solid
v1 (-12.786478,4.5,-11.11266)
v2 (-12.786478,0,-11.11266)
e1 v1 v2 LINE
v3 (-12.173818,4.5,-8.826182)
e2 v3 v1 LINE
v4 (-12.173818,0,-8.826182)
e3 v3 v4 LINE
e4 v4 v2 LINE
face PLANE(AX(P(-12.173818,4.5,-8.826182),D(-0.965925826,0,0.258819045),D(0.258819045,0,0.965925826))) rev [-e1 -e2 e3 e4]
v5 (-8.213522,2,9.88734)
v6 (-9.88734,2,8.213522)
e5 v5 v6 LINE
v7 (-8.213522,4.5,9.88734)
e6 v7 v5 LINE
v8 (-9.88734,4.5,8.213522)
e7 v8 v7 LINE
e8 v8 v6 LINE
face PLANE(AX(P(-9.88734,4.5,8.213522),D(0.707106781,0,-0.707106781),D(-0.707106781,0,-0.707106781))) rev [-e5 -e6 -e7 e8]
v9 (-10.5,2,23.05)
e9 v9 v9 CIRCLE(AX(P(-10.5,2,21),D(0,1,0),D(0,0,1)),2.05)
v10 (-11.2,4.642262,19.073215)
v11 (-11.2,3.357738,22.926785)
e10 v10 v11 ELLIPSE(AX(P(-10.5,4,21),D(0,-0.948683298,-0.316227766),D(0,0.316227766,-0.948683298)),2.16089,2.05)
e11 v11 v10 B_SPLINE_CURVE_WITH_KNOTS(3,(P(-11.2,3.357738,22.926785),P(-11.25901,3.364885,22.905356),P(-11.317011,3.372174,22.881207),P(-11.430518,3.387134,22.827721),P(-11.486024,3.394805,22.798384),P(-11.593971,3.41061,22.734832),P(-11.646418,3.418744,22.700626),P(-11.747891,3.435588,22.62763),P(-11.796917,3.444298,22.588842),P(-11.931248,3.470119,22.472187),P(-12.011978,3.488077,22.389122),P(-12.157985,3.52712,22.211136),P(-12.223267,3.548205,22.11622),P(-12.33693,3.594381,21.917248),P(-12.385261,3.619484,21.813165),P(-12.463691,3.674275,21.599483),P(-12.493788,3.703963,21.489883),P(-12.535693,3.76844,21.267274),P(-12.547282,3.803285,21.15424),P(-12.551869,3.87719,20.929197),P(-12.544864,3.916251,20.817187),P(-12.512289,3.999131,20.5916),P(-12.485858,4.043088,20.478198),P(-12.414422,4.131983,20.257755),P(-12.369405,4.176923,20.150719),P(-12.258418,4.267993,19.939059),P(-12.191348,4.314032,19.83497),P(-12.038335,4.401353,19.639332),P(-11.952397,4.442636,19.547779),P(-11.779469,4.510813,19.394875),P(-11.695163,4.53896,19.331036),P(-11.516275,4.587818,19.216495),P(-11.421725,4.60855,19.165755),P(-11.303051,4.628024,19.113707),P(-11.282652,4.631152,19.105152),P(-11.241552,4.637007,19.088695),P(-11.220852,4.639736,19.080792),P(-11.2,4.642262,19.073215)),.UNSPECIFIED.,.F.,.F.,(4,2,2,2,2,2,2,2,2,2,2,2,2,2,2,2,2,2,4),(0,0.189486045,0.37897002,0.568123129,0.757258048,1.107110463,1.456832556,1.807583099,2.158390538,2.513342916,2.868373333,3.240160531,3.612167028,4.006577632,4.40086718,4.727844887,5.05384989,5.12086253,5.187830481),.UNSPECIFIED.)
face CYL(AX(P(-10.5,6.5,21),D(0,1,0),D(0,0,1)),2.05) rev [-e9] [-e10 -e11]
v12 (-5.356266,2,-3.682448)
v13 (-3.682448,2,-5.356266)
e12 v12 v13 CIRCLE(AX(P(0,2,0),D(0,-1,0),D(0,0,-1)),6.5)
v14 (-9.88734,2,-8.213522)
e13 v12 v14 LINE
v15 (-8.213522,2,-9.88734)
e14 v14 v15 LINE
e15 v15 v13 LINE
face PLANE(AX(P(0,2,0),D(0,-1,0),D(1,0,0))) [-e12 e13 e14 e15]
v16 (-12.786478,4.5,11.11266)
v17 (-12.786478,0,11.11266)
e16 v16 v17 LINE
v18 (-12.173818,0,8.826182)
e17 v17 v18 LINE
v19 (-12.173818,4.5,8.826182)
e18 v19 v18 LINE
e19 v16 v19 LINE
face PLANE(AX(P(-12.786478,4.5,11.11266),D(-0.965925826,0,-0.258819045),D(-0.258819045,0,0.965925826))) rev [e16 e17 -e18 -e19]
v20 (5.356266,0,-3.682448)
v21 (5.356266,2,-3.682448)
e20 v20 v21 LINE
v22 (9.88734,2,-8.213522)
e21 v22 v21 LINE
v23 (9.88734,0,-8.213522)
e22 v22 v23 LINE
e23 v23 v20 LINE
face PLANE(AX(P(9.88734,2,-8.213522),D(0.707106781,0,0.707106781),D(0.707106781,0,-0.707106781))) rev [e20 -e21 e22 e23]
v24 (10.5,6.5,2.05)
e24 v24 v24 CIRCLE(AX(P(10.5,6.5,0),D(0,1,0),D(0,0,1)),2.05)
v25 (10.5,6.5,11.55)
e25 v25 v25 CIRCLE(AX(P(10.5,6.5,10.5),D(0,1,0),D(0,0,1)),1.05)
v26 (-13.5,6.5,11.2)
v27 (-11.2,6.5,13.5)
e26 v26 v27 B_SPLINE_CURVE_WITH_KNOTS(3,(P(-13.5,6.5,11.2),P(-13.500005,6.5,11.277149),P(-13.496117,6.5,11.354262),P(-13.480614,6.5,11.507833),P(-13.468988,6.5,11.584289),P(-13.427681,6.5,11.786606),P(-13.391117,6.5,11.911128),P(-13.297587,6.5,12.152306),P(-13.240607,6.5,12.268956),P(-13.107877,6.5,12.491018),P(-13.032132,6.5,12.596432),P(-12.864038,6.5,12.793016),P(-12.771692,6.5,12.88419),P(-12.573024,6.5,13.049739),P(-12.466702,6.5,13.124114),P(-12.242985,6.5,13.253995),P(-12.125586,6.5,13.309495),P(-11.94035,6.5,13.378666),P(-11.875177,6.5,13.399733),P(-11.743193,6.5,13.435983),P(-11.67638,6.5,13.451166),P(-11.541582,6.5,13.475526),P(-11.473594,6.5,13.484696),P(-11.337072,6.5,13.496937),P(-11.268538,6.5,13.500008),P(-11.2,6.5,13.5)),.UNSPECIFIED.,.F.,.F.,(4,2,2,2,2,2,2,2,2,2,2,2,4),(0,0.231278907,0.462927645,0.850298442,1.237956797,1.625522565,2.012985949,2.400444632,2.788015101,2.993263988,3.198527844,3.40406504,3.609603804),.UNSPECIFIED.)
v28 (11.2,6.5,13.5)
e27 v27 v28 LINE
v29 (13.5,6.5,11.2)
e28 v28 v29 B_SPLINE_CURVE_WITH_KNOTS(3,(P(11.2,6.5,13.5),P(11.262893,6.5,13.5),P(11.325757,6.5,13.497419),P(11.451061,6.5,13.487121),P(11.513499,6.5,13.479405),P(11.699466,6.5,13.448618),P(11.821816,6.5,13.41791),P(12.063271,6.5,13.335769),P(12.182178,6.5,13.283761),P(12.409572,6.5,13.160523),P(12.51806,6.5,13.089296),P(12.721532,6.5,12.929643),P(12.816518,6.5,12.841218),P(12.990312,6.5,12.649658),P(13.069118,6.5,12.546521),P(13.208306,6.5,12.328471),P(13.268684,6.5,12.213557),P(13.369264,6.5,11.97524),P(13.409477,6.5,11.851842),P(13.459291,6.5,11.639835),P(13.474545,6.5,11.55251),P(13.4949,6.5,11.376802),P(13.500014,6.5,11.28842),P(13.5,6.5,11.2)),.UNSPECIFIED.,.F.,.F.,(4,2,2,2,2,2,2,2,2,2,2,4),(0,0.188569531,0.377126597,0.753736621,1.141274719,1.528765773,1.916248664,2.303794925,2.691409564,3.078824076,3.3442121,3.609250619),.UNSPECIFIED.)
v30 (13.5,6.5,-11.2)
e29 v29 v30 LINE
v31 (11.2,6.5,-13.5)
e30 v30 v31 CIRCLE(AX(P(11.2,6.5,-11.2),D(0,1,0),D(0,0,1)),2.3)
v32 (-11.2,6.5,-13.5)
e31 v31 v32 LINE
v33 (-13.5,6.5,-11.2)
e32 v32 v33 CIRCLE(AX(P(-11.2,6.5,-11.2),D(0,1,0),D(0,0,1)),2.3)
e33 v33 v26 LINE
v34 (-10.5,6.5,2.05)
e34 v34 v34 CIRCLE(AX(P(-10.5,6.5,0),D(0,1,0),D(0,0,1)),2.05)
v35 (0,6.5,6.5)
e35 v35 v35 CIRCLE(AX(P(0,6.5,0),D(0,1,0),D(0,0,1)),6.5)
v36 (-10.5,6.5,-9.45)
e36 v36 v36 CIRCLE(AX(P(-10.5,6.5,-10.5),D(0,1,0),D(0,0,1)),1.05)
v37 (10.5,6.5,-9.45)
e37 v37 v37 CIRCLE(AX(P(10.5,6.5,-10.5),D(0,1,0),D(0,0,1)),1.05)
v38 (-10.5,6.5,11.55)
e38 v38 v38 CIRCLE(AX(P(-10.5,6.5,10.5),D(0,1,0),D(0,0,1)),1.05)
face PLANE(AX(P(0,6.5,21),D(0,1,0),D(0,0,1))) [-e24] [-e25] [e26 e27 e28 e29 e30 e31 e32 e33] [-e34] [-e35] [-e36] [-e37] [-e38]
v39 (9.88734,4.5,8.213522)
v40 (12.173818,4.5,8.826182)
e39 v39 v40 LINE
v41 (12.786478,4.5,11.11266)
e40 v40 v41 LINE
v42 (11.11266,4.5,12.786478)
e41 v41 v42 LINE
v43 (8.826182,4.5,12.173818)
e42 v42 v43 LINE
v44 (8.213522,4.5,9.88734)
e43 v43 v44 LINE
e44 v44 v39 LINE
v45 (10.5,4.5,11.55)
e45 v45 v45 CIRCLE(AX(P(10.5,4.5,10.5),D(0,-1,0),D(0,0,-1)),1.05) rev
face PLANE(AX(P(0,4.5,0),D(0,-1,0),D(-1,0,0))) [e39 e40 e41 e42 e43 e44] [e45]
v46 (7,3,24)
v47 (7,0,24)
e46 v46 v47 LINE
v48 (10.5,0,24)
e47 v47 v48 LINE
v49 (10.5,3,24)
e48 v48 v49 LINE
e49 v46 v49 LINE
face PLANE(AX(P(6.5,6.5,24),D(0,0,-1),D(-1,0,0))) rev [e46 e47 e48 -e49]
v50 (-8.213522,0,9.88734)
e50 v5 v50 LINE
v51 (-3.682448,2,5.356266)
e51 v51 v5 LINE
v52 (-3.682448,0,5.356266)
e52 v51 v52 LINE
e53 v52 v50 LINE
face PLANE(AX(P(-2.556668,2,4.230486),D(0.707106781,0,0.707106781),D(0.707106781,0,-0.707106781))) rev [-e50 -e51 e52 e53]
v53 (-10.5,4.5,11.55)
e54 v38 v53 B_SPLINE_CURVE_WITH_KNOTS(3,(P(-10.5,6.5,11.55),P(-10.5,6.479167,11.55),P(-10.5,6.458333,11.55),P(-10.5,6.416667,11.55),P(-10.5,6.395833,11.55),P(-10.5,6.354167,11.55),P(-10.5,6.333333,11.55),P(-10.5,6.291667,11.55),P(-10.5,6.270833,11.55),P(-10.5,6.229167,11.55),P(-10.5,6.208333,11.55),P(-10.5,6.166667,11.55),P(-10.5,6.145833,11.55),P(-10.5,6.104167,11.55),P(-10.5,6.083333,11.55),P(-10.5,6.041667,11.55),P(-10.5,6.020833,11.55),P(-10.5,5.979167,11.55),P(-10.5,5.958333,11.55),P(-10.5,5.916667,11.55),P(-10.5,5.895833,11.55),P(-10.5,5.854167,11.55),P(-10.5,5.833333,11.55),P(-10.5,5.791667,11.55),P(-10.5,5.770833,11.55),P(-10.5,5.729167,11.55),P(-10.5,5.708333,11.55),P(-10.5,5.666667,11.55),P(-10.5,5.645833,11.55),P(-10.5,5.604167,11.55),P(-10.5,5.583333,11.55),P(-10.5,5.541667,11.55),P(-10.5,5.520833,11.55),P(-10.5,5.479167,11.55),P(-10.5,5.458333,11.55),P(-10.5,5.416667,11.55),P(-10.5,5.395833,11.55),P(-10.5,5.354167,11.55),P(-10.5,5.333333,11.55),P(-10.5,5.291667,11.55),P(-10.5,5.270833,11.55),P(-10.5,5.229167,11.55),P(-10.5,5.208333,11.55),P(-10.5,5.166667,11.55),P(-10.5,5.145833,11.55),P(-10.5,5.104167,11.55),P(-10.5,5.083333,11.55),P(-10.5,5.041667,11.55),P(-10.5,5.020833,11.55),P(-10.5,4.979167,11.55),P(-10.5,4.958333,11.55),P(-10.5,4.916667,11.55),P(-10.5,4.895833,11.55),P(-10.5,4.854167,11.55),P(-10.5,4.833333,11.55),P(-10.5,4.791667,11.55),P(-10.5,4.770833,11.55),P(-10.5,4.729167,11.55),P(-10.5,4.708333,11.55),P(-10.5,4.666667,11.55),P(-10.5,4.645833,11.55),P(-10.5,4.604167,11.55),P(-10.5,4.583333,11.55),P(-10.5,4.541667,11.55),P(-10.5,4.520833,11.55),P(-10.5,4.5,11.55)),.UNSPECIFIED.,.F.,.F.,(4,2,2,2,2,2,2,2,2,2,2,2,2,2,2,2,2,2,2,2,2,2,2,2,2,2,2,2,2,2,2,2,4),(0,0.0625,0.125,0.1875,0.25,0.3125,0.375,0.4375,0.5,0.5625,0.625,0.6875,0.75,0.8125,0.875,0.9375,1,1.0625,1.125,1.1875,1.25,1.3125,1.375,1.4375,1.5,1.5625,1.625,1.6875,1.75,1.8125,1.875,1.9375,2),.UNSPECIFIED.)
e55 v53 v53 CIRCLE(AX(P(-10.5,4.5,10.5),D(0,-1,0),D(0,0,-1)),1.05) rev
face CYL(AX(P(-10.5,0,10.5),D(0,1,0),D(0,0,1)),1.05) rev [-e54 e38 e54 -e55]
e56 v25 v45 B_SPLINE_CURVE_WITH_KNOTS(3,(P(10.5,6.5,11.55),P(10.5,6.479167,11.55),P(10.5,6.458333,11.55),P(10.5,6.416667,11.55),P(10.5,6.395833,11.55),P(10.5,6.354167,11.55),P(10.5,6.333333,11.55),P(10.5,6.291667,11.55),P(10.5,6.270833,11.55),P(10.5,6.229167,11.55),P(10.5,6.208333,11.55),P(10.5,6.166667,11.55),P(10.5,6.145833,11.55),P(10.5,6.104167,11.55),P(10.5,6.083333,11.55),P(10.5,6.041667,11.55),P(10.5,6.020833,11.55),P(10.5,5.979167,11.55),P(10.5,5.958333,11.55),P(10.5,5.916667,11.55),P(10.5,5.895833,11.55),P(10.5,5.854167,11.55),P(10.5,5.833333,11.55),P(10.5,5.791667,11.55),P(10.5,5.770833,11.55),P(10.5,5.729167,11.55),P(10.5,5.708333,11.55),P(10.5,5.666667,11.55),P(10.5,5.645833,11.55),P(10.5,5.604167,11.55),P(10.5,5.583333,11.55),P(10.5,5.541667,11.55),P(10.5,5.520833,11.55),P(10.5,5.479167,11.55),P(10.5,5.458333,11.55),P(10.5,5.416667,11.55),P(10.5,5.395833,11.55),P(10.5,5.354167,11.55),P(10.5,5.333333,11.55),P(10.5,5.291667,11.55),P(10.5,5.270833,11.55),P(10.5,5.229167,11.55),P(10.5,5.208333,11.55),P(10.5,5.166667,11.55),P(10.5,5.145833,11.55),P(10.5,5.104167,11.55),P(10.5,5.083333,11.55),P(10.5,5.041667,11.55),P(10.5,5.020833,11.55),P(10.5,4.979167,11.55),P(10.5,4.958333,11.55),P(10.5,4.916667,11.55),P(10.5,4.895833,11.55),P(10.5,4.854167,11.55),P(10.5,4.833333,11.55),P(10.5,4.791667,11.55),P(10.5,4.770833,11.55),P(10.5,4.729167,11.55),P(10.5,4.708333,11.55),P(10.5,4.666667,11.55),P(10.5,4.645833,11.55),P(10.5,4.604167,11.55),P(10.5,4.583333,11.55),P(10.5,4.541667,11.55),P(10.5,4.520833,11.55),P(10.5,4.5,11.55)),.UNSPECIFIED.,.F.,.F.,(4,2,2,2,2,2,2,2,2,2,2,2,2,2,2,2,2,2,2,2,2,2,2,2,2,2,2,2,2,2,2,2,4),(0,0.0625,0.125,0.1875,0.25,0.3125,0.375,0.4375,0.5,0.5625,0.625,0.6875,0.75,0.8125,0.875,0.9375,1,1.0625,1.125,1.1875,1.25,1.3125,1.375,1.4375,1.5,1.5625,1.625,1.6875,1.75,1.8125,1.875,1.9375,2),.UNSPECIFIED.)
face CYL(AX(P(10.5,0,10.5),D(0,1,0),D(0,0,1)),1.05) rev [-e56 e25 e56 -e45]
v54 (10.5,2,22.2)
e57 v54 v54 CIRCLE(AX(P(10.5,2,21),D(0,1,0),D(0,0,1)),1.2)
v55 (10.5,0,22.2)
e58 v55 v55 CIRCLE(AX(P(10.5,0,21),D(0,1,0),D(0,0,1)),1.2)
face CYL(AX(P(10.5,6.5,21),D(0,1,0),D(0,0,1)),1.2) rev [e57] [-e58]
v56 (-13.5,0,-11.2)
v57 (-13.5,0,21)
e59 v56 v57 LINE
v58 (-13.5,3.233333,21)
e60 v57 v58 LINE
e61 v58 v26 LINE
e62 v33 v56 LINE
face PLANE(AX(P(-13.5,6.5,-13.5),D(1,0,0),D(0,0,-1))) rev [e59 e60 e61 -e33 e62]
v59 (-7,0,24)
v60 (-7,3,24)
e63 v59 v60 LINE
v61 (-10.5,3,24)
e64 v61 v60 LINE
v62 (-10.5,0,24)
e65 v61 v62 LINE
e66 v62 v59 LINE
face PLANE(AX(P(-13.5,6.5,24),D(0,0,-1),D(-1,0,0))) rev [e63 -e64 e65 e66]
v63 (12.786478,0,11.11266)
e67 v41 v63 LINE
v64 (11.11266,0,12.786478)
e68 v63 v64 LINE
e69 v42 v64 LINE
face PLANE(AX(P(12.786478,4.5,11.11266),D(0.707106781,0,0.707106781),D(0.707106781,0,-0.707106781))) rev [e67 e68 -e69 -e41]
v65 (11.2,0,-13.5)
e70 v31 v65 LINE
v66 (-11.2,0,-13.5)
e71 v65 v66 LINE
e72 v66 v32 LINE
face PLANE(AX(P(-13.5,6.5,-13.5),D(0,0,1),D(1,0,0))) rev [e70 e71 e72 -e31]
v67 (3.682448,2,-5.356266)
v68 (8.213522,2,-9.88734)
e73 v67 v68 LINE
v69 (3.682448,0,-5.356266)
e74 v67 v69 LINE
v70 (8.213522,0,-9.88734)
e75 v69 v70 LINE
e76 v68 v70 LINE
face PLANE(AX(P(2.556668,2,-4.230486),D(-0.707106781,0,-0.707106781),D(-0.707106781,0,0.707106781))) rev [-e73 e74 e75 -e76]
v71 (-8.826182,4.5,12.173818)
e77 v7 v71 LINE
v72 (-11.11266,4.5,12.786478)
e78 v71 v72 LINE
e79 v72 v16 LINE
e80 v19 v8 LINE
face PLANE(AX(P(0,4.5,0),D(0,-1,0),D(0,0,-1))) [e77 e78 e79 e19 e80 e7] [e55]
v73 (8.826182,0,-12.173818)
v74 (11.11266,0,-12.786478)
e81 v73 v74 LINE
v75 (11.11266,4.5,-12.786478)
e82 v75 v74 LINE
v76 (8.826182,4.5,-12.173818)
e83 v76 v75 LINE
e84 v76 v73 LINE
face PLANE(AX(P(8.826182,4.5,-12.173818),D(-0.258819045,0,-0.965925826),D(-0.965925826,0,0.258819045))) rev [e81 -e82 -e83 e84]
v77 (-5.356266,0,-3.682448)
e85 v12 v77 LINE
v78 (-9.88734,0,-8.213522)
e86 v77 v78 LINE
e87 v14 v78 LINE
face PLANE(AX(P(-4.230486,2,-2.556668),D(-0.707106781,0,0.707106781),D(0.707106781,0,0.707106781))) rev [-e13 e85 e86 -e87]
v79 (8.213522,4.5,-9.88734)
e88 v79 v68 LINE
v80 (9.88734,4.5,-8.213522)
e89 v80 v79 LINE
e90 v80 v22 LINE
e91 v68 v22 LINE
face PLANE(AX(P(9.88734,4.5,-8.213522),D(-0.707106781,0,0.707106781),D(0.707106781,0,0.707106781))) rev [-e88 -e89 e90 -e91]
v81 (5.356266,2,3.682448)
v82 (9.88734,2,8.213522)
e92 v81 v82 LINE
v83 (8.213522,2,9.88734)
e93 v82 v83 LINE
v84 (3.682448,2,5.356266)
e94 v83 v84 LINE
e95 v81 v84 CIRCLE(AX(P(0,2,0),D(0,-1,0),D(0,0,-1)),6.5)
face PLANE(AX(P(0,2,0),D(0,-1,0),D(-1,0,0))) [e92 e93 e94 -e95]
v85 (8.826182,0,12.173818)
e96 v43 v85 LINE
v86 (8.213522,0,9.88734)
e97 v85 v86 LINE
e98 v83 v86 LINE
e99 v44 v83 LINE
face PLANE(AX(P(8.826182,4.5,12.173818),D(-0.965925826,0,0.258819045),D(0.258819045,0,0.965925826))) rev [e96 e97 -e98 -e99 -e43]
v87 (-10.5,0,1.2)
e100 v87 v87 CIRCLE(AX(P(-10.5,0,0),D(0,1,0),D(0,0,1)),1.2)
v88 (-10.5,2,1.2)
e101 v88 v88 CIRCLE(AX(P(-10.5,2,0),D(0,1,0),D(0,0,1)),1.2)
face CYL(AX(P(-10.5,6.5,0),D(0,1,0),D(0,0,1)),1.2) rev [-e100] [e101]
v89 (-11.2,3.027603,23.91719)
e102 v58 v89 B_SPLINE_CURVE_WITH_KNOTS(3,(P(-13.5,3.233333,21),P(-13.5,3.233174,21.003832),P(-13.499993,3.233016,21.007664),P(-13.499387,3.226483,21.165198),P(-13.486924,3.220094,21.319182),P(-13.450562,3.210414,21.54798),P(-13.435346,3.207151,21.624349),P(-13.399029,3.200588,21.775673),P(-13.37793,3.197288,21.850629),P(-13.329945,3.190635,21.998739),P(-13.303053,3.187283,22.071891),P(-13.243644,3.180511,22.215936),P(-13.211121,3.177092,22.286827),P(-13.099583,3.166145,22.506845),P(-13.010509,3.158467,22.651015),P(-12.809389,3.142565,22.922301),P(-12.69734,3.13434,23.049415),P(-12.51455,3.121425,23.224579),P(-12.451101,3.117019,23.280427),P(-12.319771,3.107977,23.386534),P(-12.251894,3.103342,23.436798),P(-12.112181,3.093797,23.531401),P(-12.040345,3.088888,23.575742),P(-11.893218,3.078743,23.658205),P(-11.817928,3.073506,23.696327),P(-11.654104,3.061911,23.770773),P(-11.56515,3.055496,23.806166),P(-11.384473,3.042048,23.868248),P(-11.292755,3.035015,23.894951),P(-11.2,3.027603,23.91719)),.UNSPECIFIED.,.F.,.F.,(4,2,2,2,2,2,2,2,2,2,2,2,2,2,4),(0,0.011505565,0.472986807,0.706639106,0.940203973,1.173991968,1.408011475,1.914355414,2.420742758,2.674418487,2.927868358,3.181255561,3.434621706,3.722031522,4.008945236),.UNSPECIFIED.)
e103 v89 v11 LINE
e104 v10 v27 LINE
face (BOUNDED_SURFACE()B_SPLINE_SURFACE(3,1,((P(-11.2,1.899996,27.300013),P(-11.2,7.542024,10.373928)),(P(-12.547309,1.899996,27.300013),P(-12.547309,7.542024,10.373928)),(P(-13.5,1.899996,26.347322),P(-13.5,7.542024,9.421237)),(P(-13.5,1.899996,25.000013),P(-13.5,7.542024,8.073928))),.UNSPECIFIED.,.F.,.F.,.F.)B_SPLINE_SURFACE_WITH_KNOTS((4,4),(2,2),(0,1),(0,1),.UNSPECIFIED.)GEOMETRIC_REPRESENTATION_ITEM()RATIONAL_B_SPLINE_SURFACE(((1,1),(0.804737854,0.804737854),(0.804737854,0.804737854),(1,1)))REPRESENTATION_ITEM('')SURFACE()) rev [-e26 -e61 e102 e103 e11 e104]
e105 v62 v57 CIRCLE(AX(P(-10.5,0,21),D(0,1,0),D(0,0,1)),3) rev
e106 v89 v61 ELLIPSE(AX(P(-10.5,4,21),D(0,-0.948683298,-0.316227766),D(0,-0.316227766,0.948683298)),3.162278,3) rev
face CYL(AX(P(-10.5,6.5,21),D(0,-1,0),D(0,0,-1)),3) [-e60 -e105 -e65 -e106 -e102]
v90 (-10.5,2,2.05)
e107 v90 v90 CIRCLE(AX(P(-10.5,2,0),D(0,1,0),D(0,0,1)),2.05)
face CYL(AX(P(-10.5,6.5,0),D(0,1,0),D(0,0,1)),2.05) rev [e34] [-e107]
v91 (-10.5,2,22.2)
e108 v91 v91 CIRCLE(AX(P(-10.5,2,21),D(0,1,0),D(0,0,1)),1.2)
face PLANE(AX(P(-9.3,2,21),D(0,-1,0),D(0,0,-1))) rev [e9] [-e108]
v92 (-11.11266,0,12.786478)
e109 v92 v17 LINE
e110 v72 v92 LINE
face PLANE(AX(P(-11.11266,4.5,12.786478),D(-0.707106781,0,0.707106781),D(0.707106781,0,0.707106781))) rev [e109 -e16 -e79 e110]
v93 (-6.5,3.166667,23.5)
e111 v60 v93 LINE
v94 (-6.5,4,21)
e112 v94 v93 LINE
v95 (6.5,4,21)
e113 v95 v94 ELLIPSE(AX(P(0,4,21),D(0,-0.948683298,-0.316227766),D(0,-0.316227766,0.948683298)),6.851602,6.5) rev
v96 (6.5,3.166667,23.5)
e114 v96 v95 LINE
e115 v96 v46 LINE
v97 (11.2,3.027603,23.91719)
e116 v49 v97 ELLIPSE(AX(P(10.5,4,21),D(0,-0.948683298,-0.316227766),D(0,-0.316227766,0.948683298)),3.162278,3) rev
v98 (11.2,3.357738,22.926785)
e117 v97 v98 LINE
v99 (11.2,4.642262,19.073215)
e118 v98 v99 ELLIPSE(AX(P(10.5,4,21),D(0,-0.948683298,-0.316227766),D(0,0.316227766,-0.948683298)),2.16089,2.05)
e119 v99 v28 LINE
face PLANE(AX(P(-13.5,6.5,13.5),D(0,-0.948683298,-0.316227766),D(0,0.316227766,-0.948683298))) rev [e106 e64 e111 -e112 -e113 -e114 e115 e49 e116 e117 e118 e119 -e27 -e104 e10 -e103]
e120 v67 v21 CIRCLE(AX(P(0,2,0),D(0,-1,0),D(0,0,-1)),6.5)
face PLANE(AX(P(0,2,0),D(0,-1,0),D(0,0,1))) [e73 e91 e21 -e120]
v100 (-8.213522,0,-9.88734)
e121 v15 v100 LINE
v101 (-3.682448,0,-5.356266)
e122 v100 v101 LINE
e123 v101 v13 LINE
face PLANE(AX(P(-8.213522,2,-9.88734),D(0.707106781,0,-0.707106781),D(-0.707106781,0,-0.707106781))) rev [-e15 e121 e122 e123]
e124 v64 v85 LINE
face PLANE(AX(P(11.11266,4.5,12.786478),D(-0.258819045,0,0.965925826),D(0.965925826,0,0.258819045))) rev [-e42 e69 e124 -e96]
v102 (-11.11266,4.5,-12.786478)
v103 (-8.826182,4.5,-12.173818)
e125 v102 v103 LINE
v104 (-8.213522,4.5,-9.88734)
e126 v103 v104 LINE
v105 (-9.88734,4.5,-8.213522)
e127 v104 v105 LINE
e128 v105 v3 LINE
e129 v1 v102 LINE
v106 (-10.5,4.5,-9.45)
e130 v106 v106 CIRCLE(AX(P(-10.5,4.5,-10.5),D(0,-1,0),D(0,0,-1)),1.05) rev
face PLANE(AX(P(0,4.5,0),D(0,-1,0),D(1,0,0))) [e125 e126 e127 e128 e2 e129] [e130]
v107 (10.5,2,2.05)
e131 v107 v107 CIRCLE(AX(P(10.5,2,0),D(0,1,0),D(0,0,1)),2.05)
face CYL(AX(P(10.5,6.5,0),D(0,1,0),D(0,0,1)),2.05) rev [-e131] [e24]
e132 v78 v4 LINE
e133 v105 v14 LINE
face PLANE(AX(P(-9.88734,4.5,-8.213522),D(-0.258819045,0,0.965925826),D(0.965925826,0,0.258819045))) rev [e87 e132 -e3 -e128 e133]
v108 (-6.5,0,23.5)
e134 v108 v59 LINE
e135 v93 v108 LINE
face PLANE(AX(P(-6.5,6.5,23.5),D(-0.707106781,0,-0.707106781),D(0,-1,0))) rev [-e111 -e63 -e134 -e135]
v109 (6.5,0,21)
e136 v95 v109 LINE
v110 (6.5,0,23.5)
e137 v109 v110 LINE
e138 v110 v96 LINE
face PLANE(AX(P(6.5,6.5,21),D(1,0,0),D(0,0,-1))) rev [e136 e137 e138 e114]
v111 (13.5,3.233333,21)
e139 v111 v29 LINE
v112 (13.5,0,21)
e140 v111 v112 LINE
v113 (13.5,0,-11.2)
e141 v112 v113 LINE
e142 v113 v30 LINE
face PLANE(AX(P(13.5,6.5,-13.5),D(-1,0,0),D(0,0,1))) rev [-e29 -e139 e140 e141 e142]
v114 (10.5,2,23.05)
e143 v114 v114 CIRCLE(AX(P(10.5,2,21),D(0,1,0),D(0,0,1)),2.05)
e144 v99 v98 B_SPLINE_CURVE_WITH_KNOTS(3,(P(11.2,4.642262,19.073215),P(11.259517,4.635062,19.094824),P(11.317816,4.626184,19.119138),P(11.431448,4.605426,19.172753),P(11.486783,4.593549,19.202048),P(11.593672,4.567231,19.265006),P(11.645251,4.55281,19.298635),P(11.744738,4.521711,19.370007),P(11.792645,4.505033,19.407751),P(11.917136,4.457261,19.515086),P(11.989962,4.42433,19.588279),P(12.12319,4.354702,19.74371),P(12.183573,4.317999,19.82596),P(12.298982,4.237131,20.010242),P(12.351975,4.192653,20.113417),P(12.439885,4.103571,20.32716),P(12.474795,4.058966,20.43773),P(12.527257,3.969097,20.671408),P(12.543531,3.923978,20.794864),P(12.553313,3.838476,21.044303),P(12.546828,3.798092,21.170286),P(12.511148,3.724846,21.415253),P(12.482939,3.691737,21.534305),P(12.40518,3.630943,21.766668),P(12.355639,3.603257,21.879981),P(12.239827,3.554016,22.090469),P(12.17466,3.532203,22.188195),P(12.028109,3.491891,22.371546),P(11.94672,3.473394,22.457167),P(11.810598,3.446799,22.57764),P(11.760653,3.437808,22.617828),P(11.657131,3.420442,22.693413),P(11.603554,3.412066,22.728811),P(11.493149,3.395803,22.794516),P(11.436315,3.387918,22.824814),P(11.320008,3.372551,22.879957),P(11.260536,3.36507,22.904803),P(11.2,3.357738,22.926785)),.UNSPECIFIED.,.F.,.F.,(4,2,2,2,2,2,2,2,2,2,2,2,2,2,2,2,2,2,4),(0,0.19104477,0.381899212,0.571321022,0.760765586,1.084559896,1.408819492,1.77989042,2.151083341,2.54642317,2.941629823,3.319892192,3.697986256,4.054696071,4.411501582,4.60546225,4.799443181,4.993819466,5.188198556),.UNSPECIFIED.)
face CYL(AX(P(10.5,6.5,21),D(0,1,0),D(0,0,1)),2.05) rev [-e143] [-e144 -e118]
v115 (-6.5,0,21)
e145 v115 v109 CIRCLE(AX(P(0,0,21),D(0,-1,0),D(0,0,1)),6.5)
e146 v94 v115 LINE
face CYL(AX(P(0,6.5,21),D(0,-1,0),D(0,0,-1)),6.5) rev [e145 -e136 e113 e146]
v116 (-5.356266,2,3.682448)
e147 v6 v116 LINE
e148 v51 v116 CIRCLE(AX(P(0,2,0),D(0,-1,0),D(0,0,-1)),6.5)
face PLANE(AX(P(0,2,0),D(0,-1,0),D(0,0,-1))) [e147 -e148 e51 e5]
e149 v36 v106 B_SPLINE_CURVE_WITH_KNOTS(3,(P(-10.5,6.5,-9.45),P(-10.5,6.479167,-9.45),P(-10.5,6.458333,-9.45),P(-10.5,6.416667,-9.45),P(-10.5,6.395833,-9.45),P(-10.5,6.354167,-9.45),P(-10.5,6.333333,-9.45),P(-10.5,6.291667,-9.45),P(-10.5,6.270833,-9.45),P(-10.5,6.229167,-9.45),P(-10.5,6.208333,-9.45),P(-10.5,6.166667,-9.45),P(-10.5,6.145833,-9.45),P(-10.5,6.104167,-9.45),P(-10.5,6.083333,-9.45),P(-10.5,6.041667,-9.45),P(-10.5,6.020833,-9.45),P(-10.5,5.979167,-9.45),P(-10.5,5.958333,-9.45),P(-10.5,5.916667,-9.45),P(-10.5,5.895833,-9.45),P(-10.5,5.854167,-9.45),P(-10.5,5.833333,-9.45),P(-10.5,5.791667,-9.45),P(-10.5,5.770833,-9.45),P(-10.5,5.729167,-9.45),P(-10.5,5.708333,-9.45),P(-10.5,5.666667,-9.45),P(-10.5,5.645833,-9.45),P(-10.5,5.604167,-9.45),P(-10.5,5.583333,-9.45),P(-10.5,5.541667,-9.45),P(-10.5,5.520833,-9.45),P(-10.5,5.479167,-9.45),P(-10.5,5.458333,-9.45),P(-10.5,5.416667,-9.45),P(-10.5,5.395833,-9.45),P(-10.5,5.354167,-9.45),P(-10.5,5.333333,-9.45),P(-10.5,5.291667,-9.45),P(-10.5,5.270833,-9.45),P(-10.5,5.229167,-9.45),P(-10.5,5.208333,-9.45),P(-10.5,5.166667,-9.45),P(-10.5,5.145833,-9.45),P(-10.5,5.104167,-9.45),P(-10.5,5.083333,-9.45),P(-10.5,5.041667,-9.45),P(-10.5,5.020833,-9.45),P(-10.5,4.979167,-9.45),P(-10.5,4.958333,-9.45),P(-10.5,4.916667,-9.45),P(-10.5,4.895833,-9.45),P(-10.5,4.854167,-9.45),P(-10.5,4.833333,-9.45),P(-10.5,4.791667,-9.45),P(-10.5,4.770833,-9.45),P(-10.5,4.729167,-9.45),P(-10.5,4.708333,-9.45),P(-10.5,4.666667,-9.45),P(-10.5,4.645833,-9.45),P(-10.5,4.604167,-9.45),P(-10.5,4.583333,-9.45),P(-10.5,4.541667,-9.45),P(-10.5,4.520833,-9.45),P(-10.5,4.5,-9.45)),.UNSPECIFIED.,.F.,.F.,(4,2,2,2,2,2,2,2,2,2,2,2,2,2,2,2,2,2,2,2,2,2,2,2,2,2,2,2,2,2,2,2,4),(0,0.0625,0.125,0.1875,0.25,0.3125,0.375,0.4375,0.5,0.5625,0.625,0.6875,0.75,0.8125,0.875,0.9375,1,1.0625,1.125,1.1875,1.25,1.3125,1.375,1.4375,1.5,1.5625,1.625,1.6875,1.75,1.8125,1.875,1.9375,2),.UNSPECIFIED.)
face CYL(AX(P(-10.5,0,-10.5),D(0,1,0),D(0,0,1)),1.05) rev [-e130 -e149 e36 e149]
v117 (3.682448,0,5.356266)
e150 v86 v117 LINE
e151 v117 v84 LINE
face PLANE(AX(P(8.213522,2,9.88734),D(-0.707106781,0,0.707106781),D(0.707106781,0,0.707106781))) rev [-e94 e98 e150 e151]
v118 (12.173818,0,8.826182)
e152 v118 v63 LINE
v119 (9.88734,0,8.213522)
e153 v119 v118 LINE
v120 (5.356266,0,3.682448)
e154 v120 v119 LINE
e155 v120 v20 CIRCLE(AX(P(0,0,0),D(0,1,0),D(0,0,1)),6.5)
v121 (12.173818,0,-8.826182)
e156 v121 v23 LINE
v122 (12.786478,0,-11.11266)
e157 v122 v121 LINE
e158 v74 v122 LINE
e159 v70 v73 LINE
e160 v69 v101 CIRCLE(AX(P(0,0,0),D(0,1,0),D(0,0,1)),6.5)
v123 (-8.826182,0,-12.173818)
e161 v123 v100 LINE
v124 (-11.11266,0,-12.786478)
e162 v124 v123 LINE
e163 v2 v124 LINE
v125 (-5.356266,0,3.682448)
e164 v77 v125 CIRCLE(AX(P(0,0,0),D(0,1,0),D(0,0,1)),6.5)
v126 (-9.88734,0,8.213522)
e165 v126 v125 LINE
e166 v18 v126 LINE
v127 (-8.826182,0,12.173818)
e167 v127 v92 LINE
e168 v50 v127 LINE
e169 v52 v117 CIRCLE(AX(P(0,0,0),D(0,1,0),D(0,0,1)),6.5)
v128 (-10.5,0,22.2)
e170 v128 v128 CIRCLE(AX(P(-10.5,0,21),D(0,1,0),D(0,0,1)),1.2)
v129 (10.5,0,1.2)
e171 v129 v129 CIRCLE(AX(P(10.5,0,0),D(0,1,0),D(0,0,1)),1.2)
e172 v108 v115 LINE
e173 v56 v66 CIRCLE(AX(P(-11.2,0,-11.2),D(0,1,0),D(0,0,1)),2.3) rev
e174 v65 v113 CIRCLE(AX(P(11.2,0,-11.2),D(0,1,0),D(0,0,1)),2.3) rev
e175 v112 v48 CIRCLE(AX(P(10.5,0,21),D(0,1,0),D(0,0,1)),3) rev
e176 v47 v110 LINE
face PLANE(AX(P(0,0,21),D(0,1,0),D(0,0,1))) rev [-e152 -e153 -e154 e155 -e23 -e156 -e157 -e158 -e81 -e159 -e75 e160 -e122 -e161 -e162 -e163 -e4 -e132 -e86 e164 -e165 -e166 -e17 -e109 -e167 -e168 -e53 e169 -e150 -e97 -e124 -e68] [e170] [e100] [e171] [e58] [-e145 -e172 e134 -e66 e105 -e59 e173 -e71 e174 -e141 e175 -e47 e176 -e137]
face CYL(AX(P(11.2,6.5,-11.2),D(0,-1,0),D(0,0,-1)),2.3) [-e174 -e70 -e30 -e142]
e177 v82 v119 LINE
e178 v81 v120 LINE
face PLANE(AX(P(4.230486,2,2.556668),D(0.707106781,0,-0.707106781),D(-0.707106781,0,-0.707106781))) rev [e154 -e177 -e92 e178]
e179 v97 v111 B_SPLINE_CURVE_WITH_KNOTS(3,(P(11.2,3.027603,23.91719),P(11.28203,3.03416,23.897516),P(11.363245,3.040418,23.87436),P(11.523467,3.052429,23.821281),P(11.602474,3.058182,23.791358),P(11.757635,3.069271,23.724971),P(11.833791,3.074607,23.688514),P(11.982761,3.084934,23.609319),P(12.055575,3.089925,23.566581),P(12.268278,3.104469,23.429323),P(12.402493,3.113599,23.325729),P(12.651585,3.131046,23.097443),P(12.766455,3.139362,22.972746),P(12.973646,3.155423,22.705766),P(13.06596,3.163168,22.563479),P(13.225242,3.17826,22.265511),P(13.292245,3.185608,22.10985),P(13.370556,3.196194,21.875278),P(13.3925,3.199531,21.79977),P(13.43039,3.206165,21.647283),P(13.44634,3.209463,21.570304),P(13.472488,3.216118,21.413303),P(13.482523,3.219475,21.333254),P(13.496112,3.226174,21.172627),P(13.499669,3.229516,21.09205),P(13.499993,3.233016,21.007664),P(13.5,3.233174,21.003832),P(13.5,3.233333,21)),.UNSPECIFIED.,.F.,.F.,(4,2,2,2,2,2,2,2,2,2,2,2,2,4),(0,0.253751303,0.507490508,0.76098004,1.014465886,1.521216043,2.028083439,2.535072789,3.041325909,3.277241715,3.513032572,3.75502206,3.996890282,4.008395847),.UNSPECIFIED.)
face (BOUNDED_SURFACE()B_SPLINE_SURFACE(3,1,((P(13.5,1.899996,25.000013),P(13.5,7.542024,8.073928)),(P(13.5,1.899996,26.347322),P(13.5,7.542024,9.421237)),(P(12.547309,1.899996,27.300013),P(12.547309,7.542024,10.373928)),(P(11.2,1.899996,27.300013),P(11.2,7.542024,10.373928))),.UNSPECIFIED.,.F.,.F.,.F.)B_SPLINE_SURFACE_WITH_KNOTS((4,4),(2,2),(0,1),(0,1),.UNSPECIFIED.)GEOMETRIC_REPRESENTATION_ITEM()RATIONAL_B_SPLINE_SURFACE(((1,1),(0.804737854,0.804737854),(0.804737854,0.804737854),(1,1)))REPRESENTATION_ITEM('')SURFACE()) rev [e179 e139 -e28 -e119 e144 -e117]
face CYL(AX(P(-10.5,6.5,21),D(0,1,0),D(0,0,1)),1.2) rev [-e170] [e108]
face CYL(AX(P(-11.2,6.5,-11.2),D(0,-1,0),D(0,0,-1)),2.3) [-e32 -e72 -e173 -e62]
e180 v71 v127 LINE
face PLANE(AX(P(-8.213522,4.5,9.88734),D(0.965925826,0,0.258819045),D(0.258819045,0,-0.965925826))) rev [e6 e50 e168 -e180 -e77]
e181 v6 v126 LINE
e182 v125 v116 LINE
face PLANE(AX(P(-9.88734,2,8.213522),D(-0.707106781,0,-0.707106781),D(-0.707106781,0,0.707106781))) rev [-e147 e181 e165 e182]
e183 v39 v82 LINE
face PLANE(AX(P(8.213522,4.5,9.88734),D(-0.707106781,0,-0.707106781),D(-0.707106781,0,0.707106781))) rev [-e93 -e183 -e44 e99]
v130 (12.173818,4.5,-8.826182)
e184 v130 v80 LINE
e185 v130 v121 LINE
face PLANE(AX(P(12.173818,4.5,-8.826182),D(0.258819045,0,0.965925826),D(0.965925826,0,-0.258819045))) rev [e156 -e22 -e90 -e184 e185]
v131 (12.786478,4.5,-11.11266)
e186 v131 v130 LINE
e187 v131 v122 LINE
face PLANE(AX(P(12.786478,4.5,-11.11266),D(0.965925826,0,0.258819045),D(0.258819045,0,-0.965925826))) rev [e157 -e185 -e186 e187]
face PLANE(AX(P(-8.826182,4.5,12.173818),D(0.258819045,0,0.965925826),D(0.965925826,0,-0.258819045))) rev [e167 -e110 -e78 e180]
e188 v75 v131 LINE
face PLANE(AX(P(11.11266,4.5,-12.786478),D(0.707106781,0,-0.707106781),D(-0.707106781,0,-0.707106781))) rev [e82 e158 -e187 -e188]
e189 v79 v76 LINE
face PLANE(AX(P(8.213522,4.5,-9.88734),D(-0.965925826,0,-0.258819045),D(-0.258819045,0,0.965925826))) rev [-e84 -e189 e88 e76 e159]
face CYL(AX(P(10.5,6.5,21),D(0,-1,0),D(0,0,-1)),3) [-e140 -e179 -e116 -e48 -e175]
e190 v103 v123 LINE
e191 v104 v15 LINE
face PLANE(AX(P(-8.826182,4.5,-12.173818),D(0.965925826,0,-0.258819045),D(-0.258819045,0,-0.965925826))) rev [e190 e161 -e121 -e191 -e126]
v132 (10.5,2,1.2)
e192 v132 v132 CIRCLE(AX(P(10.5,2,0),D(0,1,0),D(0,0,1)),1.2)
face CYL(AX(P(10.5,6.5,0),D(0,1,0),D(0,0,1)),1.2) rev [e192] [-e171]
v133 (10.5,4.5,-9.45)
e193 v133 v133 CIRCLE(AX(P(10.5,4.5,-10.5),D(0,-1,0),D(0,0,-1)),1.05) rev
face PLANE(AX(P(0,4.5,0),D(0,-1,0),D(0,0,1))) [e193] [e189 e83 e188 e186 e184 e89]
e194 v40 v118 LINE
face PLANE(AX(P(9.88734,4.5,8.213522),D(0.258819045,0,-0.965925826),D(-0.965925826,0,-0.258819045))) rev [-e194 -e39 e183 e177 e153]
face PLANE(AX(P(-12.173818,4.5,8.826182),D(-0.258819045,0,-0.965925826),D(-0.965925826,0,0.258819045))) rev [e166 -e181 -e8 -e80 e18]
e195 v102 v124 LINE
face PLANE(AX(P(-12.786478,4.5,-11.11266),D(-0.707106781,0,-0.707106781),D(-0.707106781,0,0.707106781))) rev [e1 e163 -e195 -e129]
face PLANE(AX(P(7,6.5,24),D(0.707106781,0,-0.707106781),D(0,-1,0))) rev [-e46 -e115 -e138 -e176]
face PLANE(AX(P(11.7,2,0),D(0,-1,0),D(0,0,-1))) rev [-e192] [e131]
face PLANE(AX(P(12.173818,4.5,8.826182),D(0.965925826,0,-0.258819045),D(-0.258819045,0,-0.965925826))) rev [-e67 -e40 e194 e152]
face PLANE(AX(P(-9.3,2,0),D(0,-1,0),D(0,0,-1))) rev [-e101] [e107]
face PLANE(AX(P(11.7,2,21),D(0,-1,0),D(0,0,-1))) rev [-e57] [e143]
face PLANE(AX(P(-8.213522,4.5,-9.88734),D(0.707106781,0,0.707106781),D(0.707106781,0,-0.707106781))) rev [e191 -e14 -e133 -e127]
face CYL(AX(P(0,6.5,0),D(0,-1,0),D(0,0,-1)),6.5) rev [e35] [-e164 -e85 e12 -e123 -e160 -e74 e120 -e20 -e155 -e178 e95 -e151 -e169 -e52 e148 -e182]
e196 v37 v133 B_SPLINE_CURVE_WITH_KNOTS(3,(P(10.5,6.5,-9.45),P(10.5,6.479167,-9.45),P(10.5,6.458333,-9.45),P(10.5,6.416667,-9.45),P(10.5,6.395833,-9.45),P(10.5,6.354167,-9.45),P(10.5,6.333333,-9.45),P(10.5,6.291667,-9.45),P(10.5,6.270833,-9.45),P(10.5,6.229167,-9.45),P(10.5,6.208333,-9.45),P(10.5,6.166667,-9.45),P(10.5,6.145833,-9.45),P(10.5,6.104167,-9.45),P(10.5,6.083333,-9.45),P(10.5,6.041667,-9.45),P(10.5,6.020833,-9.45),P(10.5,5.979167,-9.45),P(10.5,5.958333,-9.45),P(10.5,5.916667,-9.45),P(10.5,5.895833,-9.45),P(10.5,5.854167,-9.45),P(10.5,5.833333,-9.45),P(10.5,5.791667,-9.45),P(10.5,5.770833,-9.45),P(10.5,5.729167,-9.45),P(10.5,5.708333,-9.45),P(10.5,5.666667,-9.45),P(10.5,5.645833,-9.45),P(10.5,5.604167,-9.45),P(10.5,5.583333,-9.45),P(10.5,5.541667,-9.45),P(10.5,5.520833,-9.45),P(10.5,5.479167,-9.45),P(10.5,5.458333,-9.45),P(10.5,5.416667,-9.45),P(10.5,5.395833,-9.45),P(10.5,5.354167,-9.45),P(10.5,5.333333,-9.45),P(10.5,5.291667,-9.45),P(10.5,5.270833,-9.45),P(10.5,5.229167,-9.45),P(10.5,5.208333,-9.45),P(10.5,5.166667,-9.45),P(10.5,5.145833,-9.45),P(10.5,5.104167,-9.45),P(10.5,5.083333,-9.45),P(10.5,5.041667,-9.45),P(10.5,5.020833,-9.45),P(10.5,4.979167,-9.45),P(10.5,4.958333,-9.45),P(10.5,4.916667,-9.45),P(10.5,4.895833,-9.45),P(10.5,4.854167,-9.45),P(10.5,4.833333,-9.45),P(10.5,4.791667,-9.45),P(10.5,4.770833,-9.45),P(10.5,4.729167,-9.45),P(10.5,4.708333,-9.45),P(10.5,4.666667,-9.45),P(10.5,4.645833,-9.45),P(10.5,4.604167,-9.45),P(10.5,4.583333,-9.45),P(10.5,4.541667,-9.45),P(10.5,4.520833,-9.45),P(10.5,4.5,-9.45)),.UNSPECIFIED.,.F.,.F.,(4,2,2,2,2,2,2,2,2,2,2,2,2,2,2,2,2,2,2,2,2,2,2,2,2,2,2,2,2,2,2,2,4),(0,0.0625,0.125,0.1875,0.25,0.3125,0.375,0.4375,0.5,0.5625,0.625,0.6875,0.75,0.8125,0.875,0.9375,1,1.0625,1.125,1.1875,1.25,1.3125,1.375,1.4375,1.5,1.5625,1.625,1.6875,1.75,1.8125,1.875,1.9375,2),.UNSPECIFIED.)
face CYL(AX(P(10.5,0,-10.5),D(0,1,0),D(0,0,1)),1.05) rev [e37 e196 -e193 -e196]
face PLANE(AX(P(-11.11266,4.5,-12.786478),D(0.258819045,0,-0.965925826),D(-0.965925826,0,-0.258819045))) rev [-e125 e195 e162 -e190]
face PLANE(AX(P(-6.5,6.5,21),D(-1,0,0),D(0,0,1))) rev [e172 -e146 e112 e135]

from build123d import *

# Parameters (mm, degrees)
SKETCH_1_R                   = 6.5
EXTRUDE_1_DEPTH              = 6.5
CUT_EXTRUDE_1_DEPTH          = 37.704904304
FILLET_2_R                   = 2.3
SWEEP_START                  = -22.062157242
SWEEP_2_DEPTH                = 13.492384883
CHAMFER_1_SIZE               = 0.5
FILLET_3_R                   = 3
HOLE_WIZARD_M2_1_D           = 2.4
HOLE_WIZARD_M2_1_DEPTH       = 8.5
HOLE_WIZARD_M2_1_CBORE_D     = 4.1
HOLE_WIZARD_M2_1_CBORE_DEPTH = 4.5
HOLE_WIZARD_M2_1_TIP         = 0.721032743
SKETCH_7_R                   = 1.05
CUT_EXTRUDE_2_DEPTH          = 6.5
CUT_EXTRUDE_3_DEPTH          = 4.5
CUT_EXTRUDE_4_DEPTH          = 2
PATTERN_CIRCULAR_1_COUNT     = 4


# Read off the part's stored shape, not the designer's step: ｶｯﾄ - ｽｲｰﾌﾟ2
with BuildPart() as part:
    # ｽｹｯﾁ1 → ﾎﾞｽ - 押し出し1 (new body)
    with BuildSketch(Plane(origin=(0, 0, 0), x_dir=(1, 0, 0), z_dir=(0, 1, 0))):
        with BuildLine():
            Line((-13.5, 13.5), (13.5, 13.5))
            Line((13.5, 13.5), (13.5, -24))
            Line((13.5, -24), (6.5, -24))
            Line((6.5, -24), (6.5, -21))
            ThreePointArc((6.5, -21), (0, -14.5), (-6.5, -21))
            Line((-6.5, -21), (-6.5, -24))
            Line((-6.5, -24), (-13.5, -24))
            Line((-13.5, -24), (-13.5, 13.5))
        make_face()
        with Locations(Location((0, 0, 0), (0, 0, 90))):
            Circle(SKETCH_1_R, mode=Mode.SUBTRACT)
    extrude(amount=EXTRUDE_1_DEPTH)

    # ｽｹｯﾁ2 → ｶｯﾄ - 押し出し1 (cut, through all)
    with BuildSketch(Plane(origin=(13.5, 0, 0), x_dir=(0, 0, -1), z_dir=(1, 0, 0))):
        Polygon((-24, 3), (-24, 6.5), (-13.5, 6.5), align=None)
    extrude(amount=-CUT_EXTRUDE_1_DEPTH, mode=Mode.SUBTRACT)

    # ﾌｨﾚｯﾄ2
    fillet_2_edges = [part.edges().sort_by_distance(p)[0] for p in [
        (-13.5, 3.25, -13.5),
        (13.5, 3.25, -13.5),
    ]]
    fillet(fillet_2_edges, radius=FILLET_2_R)

    # ｶｯﾄ - ｽｲｰﾌﾟ2 outline → ｶｯﾄ - ｽｲｰﾌﾟ2 (cut)
    with BuildSketch(Plane(origin=(0, 0, 0), x_dir=(1, 0, 0), z_dir=(0, 0.3162277660168393, -0.9486832980505134)).offset(SWEEP_START)):
        with BuildLine():
            Line((-13.5, -10.435516279), (-11.2, -10.435516279))
            add(Edge.make_bspline(
                [(-11.2, -10.435516279), (-12.547308807, -10.435516279), (-13.5, -10.134248871), (-13.5, -9.708192417)],
                knots=[0, 0, 0, 0, 1, 1, 1, 1], degree=3, weights=[1, 0.804737854, 0.804737854, 1]))
            Line((-13.5, -9.708192417), (-13.5, -10.435516279))
        make_face()
        with BuildLine():
            add(Edge.make_bspline(
                [(13.5, -9.708192417), (13.5, -10.134248871), (12.547308807, -10.435516279), (11.2, -10.435516279)],
                knots=[0, 0, 0, 0, 1, 1, 1, 1], degree=3, weights=[1, 0.804737854, 0.804737854, 1]))
            Line((11.2, -10.435516279), (13.5, -10.435516279))
            Line((13.5, -10.435516279), (13.5, -9.708192417))
        make_face()
    extrude(amount=SWEEP_2_DEPTH, mode=Mode.SUBTRACT)

    # 面取り1
    chamfer_1_edges = [part.edges().sort_by_distance(p)[0] for p in [
        (6.5, 1.5, 24),
        (-6.5, 1.5, 24),
    ]]
    chamfer(chamfer_1_edges, length=CHAMFER_1_SIZE)

    # ﾌｨﾚｯﾄ3
    # the kernel refuses this fillet: 3 mm, written as the material it takes off along each edge
    with BuildSketch(Plane(origin=(13.5, -7.5, 24), x_dir=(0, 0, -1), z_dir=(0, 1, 0)), Plane(origin=(-13.5, -7.5, 24), x_dir=(1, 0, 0), z_dir=(0, 1, 0))) as fillet_3_piece_1:
        with BuildLine():
            CenterArc((FILLET_3_R, FILLET_3_R), FILLET_3_R, 180, 90)
            Line((0, FILLET_3_R), (0, 0))
            Line((0, 0), (FILLET_3_R, 0))
        make_face()
    extrude(amount=17.233333302, mode=Mode.SUBTRACT)

    # M2 なべ頭ねじ用座ぐり穴1
    with Locations(Plane(origin=(0, 6.5, 0), x_dir=(1, 0, 0), z_dir=(0, 1, 0))):
        with Locations((-10.5, 0), (10.5, 0), (10.5, -21), (-10.5, -21)):
            CounterBoreHole(HOLE_WIZARD_M2_1_D / 2, HOLE_WIZARD_M2_1_CBORE_D / 2, HOLE_WIZARD_M2_1_CBORE_DEPTH, depth=HOLE_WIZARD_M2_1_DEPTH)
            with Locations((0, 0, -(HOLE_WIZARD_M2_1_DEPTH + HOLE_WIZARD_M2_1_TIP / 2))):  # 118° drill point
                Cone(0, HOLE_WIZARD_M2_1_D / 2, HOLE_WIZARD_M2_1_TIP, mode=Mode.SUBTRACT)

    # ｽｹｯﾁ7 → ｶｯﾄ - 押し出し2 (cut)
    with BuildSketch(Plane(origin=(0, 6.5, 0), x_dir=(1, 0, 0), z_dir=(0, 1, 0))):
        with Locations(Location((-10.5, 10.5, 0), (0, 0, 270))):
            Circle(SKETCH_7_R)
        with Locations(Location((10.5, 10.5, 0), (0, 0, 270))):
            Circle(SKETCH_7_R)
        with Locations(Location((-10.5, -10.5, 0), (0, 0, 270))):
            Circle(SKETCH_7_R)
        with Locations(Location((10.5, -10.5, 0), (0, 0, 270))):
            Circle(SKETCH_7_R)
    extrude(amount=-CUT_EXTRUDE_2_DEPTH, mode=Mode.SUBTRACT)

    # ｽｹｯﾁ8 → ｶｯﾄ - 押し出し3 (cut)
    with BuildSketch(Plane.XZ):
        Polygon((-8.213522103, 9.887340094), (-8.826182009, 12.173817991), (-11.112659906, 12.786477897), (-12.786477897, 11.112659906), (-12.173817991, 8.826182009), (-9.887340094, 8.213522103), align=None)
    cut_extrude_3 = extrude(amount=-CUT_EXTRUDE_3_DEPTH, mode=Mode.SUBTRACT)

    # ｽｹｯﾁ9 → ｶｯﾄ - 押し出し4 (cut)
    with BuildSketch(Plane.XZ):
        Polygon((-9.887340094, 8.213522103), (-4.230485845, 2.556667854), (-2.556667854, 4.230485845), (-8.213522103, 9.887340094), align=None)
    cut_extrude_4 = extrude(amount=-CUT_EXTRUDE_4_DEPTH, mode=Mode.SUBTRACT)

    # 円形ﾊﾟﾀｰﾝ1: ｶｯﾄ - 押し出し3, ｶｯﾄ - 押し出し4 ×4 about axis
    pattern_circular_1_axis = Axis((0, 0, 0), (0, 1, 0))
    add([cut_extrude_3.rotate(pattern_circular_1_axis, i * 360 / PATTERN_CIRCULAR_1_COUNT) for i in range(1, PATTERN_CIRCULAR_1_COUNT)], mode=Mode.SUBTRACT)
    add([cut_extrude_4.rotate(pattern_circular_1_axis, i * 360 / PATTERN_CIRCULAR_1_COUNT) for i in range(1, PATTERN_CIRCULAR_1_COUNT)], mode=Mode.SUBTRACT)


solid = part.part
